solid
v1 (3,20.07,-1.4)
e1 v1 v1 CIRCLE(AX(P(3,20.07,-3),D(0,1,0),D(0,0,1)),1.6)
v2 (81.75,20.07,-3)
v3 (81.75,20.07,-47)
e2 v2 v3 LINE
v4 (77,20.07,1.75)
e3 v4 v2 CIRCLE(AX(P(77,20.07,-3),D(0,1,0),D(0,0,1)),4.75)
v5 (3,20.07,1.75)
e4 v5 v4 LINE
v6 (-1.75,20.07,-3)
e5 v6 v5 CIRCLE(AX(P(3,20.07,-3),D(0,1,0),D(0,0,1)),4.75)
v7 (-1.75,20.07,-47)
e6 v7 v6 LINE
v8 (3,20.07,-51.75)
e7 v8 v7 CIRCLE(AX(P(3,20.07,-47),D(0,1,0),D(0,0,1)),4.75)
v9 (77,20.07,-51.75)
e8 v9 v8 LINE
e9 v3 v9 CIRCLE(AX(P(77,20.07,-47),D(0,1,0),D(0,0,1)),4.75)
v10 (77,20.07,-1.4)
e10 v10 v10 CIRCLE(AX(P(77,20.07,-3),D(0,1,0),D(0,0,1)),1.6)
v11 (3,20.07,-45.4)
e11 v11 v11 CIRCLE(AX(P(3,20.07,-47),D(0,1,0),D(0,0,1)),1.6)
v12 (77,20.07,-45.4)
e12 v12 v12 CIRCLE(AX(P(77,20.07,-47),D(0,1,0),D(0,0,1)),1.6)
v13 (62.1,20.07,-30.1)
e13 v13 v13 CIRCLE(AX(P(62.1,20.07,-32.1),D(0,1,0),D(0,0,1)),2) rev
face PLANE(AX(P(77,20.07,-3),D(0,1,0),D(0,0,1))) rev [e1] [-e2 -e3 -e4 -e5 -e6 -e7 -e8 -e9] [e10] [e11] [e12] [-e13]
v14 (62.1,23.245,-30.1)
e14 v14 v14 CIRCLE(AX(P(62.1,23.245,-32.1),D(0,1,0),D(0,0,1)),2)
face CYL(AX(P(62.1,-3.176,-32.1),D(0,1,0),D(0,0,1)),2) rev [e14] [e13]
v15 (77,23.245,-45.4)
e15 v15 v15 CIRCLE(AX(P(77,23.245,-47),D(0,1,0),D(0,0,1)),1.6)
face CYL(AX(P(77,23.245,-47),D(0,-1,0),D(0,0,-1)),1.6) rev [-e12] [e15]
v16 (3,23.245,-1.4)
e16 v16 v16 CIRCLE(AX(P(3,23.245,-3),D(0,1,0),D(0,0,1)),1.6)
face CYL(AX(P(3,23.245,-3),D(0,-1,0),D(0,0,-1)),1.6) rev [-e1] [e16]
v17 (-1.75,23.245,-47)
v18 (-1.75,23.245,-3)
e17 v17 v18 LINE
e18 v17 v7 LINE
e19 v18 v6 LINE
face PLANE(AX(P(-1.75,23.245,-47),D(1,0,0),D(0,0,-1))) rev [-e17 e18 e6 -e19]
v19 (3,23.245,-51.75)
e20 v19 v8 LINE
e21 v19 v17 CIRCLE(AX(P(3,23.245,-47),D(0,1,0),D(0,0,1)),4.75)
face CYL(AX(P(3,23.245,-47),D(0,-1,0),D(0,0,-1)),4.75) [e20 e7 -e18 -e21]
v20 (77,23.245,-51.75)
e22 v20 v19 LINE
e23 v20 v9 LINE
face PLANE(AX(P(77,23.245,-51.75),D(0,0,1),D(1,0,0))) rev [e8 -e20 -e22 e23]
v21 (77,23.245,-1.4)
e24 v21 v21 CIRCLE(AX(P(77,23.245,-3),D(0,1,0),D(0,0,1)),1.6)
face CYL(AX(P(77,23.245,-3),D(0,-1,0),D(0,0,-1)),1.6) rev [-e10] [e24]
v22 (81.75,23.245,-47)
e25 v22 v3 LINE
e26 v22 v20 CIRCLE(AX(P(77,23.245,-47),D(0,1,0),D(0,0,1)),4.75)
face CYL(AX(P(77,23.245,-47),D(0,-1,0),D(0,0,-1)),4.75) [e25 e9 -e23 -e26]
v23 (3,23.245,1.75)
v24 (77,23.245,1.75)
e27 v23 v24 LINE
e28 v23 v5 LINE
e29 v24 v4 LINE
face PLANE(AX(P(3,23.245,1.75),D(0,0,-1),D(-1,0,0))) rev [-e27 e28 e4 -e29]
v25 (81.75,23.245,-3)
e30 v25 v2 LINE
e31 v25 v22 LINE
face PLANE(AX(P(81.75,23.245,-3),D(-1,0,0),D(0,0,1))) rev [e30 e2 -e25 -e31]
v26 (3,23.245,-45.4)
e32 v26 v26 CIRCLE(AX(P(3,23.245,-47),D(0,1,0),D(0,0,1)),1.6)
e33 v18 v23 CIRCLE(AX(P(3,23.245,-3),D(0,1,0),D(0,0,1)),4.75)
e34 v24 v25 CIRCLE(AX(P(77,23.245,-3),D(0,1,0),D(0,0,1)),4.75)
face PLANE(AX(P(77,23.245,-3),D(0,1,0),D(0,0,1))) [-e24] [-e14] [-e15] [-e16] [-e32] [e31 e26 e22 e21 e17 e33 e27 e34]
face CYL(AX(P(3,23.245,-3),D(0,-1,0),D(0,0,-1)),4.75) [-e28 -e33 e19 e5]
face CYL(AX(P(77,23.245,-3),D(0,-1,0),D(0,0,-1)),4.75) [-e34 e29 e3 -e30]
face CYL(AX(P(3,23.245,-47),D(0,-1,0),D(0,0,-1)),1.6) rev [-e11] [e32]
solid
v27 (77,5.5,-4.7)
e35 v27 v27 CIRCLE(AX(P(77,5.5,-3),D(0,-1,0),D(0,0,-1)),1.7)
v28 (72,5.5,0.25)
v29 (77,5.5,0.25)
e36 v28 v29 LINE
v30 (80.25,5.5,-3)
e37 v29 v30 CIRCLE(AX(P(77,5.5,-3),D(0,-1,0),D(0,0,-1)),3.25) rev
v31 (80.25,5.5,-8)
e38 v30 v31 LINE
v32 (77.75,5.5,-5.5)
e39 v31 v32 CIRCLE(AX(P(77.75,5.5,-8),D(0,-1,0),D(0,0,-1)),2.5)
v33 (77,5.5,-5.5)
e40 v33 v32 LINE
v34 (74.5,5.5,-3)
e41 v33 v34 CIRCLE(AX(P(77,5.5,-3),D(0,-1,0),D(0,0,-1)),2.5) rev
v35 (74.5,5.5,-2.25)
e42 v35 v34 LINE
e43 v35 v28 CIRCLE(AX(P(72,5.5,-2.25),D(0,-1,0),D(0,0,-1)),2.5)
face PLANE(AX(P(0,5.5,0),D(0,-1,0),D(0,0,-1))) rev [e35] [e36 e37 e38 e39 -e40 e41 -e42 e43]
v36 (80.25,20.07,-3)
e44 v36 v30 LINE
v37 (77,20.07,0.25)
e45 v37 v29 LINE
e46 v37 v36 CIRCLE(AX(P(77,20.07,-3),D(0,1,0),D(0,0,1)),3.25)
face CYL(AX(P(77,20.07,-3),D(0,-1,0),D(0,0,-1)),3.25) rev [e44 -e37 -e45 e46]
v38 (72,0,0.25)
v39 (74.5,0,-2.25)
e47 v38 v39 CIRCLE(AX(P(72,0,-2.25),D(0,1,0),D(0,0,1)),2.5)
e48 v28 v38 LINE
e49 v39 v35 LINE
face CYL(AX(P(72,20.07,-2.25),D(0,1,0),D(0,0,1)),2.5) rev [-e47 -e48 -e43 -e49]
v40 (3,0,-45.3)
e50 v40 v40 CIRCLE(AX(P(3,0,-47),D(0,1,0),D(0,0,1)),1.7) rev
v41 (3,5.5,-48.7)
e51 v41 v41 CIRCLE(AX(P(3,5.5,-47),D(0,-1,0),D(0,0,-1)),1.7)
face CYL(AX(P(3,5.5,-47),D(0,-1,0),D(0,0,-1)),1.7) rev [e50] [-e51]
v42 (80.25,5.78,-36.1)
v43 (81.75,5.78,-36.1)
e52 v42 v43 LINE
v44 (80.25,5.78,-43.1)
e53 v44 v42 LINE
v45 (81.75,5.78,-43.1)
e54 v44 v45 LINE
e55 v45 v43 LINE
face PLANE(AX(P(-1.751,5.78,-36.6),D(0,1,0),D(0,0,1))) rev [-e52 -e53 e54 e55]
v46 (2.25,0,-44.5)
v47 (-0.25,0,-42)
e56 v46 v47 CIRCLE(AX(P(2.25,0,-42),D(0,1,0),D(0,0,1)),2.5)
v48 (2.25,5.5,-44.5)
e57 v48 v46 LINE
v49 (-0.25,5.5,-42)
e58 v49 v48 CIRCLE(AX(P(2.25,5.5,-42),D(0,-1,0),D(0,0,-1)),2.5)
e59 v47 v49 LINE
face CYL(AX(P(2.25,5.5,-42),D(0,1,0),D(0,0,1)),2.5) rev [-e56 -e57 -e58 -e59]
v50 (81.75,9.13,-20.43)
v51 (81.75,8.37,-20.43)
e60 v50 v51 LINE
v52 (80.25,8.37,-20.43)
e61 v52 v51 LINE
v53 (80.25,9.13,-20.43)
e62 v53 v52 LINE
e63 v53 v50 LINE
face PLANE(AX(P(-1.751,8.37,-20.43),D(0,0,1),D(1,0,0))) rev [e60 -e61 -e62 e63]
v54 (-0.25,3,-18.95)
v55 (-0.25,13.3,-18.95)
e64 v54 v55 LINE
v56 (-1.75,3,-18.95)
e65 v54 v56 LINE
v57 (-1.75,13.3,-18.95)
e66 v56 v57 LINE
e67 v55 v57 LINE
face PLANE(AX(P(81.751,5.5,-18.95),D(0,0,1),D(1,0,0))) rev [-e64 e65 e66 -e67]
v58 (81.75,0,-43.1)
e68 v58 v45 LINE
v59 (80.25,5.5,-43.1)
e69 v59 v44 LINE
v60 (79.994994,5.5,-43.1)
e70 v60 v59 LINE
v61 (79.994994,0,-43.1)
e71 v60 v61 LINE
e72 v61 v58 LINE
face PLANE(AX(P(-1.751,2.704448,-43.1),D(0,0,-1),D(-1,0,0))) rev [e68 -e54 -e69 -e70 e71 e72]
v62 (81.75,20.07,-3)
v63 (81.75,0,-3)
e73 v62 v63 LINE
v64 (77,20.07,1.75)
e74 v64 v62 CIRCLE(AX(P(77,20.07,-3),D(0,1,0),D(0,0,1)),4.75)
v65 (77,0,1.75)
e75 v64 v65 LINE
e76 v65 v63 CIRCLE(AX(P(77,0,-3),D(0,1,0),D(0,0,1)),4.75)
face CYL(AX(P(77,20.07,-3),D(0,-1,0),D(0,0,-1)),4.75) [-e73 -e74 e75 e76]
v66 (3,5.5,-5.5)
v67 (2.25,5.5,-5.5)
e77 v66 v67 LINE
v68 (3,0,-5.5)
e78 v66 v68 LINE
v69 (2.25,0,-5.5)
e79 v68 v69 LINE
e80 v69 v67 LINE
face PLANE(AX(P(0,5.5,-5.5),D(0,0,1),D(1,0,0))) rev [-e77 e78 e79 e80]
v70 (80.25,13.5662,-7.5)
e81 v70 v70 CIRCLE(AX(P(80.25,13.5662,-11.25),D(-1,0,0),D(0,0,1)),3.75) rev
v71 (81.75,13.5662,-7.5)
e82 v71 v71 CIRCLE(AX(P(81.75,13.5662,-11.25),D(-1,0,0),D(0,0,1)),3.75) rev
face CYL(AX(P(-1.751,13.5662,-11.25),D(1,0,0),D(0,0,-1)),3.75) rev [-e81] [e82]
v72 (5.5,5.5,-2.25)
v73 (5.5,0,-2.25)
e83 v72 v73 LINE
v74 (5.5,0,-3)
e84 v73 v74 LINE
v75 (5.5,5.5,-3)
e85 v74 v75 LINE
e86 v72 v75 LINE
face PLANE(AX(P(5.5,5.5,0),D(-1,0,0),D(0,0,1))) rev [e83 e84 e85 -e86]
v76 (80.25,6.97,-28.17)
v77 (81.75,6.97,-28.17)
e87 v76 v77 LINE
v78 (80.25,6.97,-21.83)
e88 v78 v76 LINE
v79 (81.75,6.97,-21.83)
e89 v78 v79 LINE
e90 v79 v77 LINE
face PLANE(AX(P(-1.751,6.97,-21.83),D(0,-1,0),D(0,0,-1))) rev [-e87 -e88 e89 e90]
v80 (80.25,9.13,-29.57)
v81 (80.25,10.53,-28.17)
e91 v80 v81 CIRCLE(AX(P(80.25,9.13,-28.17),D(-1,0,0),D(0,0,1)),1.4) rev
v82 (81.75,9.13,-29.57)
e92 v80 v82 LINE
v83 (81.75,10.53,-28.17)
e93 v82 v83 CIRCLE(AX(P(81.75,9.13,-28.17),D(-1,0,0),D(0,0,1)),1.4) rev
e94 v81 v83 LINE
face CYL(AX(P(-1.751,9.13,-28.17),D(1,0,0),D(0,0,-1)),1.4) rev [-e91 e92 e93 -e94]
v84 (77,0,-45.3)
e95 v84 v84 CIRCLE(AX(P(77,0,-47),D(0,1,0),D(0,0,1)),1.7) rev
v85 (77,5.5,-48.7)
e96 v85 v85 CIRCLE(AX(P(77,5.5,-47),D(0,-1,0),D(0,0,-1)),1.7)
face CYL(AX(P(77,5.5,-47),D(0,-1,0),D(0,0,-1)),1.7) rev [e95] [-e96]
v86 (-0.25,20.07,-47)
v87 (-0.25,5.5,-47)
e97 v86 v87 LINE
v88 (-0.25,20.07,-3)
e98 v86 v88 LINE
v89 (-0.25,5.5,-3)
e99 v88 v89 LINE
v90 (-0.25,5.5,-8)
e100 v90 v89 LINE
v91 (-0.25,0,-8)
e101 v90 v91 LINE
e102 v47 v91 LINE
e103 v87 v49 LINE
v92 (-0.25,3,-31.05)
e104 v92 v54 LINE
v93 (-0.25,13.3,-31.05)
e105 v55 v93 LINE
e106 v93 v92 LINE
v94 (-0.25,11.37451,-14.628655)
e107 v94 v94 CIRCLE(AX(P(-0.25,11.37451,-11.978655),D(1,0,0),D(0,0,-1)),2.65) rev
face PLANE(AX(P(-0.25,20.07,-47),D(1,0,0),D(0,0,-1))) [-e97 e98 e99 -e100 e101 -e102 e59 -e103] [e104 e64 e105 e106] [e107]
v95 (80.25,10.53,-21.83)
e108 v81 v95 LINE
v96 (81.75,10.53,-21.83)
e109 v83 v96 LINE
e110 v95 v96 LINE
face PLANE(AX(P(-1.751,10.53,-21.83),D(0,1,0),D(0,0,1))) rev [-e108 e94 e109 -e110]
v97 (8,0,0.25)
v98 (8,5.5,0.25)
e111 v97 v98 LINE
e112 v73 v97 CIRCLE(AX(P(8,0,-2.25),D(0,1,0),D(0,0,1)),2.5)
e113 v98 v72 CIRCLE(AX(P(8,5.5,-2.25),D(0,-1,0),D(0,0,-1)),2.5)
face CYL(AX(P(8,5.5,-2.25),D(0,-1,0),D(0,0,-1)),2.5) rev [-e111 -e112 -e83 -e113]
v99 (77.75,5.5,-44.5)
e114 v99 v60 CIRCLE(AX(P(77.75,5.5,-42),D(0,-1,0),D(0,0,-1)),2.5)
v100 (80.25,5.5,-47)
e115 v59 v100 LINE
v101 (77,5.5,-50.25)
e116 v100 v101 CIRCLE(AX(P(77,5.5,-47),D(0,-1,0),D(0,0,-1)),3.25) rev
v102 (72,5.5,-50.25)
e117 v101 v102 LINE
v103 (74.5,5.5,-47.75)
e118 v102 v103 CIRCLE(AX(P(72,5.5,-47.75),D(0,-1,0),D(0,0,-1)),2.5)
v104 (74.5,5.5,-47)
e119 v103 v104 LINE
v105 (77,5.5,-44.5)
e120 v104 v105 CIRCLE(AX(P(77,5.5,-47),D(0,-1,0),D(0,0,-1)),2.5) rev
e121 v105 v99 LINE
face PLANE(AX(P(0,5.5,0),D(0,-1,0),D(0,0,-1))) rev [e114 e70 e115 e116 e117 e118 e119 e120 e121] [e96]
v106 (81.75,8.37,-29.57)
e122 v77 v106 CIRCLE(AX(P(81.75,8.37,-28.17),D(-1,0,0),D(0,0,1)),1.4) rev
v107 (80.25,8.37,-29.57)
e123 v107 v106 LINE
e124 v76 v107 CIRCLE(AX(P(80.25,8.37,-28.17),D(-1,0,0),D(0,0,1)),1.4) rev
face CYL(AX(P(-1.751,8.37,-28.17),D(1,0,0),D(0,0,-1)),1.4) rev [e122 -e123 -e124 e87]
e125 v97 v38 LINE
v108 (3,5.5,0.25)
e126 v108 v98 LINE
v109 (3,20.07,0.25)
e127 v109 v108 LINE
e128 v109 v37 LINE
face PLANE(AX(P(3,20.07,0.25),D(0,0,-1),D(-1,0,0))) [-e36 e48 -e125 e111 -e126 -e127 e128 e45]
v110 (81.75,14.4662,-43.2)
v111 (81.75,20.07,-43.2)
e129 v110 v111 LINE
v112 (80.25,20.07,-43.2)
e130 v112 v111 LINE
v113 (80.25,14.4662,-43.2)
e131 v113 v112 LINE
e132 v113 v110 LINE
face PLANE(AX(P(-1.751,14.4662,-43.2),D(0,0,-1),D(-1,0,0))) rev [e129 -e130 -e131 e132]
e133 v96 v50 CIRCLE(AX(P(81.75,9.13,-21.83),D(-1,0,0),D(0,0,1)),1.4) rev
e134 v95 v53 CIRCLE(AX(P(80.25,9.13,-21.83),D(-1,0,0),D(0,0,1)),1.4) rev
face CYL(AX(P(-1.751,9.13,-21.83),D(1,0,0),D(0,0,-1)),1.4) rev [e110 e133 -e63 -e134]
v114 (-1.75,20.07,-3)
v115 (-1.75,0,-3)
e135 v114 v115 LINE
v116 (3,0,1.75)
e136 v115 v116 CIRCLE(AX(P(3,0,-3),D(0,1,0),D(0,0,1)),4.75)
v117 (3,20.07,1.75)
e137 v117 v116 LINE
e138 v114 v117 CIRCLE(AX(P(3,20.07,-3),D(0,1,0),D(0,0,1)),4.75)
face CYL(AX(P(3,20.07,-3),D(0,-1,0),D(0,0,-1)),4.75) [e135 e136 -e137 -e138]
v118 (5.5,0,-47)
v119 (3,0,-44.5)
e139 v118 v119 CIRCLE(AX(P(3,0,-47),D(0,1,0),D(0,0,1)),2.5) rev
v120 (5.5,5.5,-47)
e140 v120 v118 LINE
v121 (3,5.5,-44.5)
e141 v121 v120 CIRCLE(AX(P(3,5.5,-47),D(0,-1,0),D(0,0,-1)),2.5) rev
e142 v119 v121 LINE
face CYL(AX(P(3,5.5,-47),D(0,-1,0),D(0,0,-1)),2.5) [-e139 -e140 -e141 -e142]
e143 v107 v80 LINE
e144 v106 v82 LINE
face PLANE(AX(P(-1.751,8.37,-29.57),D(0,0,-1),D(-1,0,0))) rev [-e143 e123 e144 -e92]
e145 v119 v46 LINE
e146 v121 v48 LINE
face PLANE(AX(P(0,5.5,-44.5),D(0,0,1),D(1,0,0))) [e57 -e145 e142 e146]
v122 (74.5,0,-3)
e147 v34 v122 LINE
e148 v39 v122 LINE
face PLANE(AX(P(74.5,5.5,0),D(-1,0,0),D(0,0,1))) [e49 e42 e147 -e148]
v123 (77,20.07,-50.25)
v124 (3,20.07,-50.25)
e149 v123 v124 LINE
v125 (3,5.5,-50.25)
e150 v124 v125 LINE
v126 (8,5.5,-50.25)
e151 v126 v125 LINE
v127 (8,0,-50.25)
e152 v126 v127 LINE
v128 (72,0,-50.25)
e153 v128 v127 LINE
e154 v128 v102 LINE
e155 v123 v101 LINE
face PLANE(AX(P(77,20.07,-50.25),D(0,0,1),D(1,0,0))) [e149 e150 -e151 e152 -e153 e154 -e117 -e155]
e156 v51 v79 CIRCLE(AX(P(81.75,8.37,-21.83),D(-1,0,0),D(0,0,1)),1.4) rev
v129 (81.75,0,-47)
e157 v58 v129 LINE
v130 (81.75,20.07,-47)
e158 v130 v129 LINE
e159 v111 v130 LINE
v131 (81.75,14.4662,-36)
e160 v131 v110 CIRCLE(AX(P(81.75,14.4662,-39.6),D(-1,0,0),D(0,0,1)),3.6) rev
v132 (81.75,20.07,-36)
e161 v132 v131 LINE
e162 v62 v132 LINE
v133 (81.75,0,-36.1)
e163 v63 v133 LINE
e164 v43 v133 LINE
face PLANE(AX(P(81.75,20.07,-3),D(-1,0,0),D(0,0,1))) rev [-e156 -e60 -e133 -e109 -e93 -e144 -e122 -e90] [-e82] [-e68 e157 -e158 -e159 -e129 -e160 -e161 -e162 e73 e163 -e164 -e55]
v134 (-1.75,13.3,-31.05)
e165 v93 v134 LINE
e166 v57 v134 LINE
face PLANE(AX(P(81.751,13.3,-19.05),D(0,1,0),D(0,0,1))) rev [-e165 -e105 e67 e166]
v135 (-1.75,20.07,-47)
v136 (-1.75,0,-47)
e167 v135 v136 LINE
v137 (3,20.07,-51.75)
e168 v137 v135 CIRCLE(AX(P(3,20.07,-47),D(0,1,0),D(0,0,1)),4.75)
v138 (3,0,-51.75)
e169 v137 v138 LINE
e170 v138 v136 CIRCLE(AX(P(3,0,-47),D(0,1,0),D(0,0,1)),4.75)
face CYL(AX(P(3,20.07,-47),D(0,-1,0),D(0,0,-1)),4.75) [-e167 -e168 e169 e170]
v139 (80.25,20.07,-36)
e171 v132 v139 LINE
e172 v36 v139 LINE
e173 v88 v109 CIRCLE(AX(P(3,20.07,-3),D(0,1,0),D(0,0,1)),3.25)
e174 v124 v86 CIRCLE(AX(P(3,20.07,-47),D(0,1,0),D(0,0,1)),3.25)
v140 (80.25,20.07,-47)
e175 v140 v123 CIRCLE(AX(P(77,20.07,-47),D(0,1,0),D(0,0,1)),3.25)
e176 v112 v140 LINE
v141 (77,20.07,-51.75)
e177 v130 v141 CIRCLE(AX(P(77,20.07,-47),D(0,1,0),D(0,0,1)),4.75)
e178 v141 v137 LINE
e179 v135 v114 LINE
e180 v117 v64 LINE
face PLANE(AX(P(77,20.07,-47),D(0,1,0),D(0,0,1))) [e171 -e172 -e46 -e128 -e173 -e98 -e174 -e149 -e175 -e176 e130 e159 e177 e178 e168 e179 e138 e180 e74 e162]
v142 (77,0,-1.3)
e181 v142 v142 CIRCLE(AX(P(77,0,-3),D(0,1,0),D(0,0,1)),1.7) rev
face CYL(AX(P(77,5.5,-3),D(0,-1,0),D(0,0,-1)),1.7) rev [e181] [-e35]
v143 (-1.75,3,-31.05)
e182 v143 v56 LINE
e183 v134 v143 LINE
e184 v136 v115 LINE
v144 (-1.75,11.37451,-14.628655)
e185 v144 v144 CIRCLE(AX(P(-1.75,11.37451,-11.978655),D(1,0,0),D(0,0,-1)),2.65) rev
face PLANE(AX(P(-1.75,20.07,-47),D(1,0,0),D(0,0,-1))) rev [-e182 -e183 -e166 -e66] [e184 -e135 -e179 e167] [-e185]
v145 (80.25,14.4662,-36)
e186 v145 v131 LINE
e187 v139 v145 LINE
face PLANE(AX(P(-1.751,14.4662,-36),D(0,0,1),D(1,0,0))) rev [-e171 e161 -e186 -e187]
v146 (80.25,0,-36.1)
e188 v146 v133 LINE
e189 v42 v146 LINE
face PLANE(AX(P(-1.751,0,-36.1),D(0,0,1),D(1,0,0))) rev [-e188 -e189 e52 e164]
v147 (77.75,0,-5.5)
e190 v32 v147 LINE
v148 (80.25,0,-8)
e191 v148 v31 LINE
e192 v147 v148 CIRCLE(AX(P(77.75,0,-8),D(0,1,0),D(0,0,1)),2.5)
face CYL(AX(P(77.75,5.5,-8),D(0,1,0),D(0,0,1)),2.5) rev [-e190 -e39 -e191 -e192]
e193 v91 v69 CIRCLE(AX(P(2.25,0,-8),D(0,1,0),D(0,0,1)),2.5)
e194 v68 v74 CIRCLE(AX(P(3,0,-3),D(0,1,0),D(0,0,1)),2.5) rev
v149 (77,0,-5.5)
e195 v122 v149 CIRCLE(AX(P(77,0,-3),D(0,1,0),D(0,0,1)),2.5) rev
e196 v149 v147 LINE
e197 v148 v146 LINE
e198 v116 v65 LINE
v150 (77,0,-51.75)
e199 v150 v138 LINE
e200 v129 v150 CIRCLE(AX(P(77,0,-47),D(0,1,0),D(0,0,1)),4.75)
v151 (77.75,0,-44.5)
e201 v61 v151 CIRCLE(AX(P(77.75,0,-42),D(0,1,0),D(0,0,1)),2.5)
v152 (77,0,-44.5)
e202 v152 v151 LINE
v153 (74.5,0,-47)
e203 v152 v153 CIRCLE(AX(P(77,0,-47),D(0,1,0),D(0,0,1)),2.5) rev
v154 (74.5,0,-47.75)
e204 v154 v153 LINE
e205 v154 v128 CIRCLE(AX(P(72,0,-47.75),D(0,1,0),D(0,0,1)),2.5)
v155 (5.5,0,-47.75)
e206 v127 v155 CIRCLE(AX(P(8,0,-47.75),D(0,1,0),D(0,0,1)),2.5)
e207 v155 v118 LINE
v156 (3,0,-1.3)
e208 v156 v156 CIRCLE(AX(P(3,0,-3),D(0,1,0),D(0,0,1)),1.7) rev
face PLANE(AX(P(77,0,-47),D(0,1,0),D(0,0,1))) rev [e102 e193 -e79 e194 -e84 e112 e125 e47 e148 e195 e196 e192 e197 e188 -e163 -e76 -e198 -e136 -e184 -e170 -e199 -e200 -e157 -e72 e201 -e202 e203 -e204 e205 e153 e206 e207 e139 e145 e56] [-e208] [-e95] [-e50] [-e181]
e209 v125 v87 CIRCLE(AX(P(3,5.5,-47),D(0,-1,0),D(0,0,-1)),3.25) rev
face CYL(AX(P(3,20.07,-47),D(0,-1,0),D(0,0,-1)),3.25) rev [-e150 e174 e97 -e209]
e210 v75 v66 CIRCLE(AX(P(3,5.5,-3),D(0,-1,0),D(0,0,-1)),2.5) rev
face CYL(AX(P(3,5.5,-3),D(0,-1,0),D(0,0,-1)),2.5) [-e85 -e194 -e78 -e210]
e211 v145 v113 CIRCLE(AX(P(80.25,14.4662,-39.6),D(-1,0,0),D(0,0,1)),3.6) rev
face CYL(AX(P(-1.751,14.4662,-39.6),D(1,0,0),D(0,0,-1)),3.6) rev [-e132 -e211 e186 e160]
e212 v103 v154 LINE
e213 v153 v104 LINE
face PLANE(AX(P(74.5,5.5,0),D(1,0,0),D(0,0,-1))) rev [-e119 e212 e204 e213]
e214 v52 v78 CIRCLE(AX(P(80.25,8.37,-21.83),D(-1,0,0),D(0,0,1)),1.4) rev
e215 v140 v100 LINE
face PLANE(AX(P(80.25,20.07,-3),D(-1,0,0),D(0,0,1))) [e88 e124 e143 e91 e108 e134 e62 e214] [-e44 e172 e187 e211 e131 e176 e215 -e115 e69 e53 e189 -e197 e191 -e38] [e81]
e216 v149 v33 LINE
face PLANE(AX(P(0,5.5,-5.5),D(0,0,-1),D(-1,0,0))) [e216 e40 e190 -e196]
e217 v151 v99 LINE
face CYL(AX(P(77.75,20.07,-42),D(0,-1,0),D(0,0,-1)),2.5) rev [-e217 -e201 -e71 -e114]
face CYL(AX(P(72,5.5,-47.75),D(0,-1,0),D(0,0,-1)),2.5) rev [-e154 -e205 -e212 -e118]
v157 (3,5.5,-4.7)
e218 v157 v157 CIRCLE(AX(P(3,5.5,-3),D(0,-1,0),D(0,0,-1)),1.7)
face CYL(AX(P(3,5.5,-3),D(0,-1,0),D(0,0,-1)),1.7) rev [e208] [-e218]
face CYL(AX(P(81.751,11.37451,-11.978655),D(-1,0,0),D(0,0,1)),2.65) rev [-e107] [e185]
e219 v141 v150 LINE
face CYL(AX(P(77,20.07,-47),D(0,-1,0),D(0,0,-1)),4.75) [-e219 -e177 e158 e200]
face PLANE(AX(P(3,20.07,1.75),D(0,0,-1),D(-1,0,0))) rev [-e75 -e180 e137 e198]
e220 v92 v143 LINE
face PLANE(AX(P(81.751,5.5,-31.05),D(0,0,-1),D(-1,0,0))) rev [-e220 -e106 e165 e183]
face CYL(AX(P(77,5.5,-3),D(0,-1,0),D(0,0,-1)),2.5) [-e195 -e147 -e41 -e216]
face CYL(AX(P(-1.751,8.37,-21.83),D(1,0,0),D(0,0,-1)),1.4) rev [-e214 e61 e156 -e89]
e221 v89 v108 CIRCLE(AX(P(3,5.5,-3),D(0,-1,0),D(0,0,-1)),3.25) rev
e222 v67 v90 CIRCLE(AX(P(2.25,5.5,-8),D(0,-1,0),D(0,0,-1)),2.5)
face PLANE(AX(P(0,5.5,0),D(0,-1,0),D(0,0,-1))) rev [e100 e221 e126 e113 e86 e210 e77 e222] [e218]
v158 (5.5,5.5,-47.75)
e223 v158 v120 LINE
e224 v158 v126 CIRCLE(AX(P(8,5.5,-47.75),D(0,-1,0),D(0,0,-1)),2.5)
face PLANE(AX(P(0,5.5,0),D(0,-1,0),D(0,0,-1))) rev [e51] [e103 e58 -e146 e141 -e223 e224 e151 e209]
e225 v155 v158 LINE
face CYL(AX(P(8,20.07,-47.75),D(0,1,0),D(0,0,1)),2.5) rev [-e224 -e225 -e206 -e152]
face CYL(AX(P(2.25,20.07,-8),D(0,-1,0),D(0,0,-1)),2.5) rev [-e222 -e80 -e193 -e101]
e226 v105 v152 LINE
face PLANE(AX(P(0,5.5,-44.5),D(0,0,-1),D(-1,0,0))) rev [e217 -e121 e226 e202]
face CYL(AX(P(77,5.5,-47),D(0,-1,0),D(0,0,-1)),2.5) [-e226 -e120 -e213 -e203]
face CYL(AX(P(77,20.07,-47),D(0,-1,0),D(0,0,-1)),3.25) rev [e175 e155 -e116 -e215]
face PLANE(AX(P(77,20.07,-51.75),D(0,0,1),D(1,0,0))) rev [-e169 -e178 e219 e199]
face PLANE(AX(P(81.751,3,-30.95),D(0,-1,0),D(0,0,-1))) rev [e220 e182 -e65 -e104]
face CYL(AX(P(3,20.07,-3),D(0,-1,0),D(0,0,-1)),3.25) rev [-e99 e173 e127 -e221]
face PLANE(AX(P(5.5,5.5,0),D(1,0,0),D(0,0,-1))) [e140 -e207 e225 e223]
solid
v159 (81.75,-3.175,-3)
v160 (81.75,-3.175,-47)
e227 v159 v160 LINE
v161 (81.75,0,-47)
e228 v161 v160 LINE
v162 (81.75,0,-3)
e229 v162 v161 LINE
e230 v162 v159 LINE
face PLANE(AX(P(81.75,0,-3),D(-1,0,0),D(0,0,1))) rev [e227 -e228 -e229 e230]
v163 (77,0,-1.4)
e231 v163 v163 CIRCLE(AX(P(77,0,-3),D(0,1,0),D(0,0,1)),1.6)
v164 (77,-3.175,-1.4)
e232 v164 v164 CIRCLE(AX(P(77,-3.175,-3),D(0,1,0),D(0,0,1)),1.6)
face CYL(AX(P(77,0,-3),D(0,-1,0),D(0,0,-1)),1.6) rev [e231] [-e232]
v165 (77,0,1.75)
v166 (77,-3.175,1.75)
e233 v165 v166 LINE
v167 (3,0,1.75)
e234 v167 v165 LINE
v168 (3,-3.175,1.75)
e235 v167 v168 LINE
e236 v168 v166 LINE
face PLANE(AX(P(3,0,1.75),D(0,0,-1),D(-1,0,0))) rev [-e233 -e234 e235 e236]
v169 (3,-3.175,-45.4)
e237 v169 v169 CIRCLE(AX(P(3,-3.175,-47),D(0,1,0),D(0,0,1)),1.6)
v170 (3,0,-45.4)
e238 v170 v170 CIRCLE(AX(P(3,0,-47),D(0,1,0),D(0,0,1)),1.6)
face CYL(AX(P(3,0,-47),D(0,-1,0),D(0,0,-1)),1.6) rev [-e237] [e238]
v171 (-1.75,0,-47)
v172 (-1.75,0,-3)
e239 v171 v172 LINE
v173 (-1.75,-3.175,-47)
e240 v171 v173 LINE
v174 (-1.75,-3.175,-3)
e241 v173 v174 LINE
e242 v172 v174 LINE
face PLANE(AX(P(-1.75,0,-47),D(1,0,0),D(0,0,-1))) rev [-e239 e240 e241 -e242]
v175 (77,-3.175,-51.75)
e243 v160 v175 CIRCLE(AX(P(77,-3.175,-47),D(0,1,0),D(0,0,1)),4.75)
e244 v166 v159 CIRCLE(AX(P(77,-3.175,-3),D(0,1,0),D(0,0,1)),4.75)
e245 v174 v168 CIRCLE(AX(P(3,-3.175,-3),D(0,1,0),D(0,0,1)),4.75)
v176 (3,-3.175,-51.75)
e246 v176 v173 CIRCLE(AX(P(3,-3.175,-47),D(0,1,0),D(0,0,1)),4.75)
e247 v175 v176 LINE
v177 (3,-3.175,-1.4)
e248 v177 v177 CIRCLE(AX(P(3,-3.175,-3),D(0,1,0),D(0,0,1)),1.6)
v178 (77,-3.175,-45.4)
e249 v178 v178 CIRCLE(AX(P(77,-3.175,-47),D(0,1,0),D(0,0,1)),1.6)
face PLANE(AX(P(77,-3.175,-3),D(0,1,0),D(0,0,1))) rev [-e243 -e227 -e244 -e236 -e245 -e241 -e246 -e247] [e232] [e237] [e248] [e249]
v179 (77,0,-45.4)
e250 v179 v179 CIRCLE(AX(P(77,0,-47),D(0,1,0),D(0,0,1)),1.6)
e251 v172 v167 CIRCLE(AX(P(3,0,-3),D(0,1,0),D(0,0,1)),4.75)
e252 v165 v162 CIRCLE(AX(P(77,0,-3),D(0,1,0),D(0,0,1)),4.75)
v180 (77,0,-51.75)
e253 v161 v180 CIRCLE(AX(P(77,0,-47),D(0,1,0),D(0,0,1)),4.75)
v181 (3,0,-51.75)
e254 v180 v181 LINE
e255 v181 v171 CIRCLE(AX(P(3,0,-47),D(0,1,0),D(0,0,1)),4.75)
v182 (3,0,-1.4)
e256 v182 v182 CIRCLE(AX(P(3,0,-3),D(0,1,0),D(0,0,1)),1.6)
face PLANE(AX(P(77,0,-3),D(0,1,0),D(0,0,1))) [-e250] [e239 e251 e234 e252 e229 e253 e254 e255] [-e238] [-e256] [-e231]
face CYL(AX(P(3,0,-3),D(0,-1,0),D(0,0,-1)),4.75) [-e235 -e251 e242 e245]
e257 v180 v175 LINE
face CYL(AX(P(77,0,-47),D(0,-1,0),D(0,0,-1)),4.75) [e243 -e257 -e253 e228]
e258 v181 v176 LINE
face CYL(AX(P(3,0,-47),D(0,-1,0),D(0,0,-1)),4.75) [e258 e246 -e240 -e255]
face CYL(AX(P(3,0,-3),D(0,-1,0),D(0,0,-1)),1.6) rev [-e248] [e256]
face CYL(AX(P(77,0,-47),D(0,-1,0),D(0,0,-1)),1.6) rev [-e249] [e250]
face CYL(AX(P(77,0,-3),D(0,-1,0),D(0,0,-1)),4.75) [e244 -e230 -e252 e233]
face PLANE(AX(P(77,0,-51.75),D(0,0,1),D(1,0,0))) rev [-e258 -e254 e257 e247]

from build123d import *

# Parameters (mm, degrees)
BOSS_EXTRUDE1_DEPTH      = 20.07
SKETCH3_R                = 1.6
BOSS_EXTRUDE2_DEPTH      = 5.5
FILLET1_R                = 2.5
DATA_SIDE_REACH          = 102.265
SKETCH4_R                = 3.25
IO_SIDE_REACH            = 102.265
SKETCH5_R                = 2.15
SKETCH5_W                = 11.9
SKETCH5_H                = 7.3
PLUG_CLEARANCE_REACH     = 102.265
SKETCH10_W               = 11.9
SKETCH10_H               = 2.5
SKETCH10_H_2             = 0.5
MOVE_START               = 79.994994432
MOVE_FACE1_OUTLINE_R     = 3.75
MOVE_FACE1_OUTLINE_R_2   = 3.25
MOVE_FACE1_DEPTH         = 3.005005568
MOVE_START_2             = -3
MOVE_FACE1_2_OUTLINE_R   = 2.65
MOVE_FACE1_2_OUTLINE_R_2 = 2.15
MOVE_FACE1_2_DEPTH       = 82.994994432
MOVE_FACE2_BY            = 0.1
MOVE_FACE2_2_BY          = 0.1
MOVE_FACE2_3_BY          = 0.1
MOVE_FACE2_4_BY          = 0.1
MOVE_FACE2_5_BY          = 0.1
MOVE_FACE2_6_BY          = 0.1
MOVE_FACE2_7_BY          = 0.1
MOVE_FACE2_8_BY          = 0.1
MOVE_FACE2_9_BY          = 0.1
MOVE_FACE2_10_BY         = 0.1
MOVE_FACE3_BY            = 0.1
MOVE_FACE3_2_BY          = 0.1
MOVE_FACE3_3_BY          = 0.1
MOVE_FACE3_4_BY          = 0.1
SKETCH6_R                = 1.6
BOSS_EXTRUDE3_DEPTH      = 3.175
SKETCH7_R                = 2
CUT_EXTRUDE3_DEPTH       = 3.175


with BuildPart() as part:
    # Sketch2 → Boss-Extrude1 (new body)
    with BuildSketch(Plane(origin=(0, 0, 0), x_dir=(1, 0, 0), z_dir=(0, 1, 0))):
        with BuildLine():
            Line((77, 51.75), (3, 51.75))
            ThreePointArc((3, 51.75), (-0.358757211, 50.358757211), (-1.75, 47))
            Line((-1.75, 47), (-1.75, 3))
            ThreePointArc((-1.75, 3), (-0.358757211, -0.358757211), (3, -1.75))
            Line((3, -1.75), (77, -1.75))
            ThreePointArc((77, -1.75), (80.358757211, -0.358757211), (81.75, 3))
            Line((81.75, 3), (81.75, 47))
            ThreePointArc((81.75, 47), (80.358757211, 50.358757211), (77, 51.75))
        make_face()
        with BuildLine():
            Line((-0.25, 47), (-0.25, 3))
            ThreePointArc((-0.25, 3), (0.701902961, 0.701902961), (3, -0.25))
            Line((3, -0.25), (77, -0.25))
            ThreePointArc((77, -0.25), (79.298097039, 0.701902961), (80.25, 3))
            Line((80.25, 3), (80.25, 47))
            ThreePointArc((80.25, 47), (79.298097039, 49.298097039), (77, 50.25))
            Line((77, 50.25), (3, 50.25))
            ThreePointArc((3, 50.25), (0.701902961, 49.298097039), (-0.25, 47))
        make_face(mode=Mode.SUBTRACT)
    extrude(amount=BOSS_EXTRUDE1_DEPTH)

    # Sketch3 → Boss-Extrude2 (add)
    # profile 1 of 4: a face of its own
    with BuildSketch(Plane.XZ):
        with BuildLine():
            ThreePointArc((-0.25, -47), (0.701902961, -49.298097039), (3, -50.25))
            Line((3, -50.25), (5.5, -50.25))
            Line((5.5, -50.25), (5.5, -44.5))
            Line((5.5, -44.5), (-0.25, -44.5))
            Line((-0.25, -44.5), (-0.25, -47))
        make_face()
        with Locations(Location((3, -47, 0), (0, 0, 270))):
            Circle(SKETCH3_R, mode=Mode.SUBTRACT)
    # profile 2 of 4: a face of its own
    with BuildSketch(Plane.XZ):
        with BuildLine():
            Line((74.5, -44.5), (74.5, -50.25))
            Line((74.5, -50.25), (77, -50.25))
            ThreePointArc((77, -50.25), (79.298097039, -49.298097039), (80.25, -47))
            Line((80.25, -47), (80.25, -44.5))
            Line((80.25, -44.5), (74.5, -44.5))
        make_face()
        with Locations(Location((77, -47, 0), (0, 0, 270))):
            Circle(SKETCH3_R, mode=Mode.SUBTRACT)
    # profile 3 of 4: a face of its own
    with BuildSketch(Plane.XZ):
        with BuildLine():
            Line((74.5, -5.5), (80.25, -5.5))
            Line((80.25, -5.5), (80.25, -3))
            ThreePointArc((80.25, -3), (79.298097039, -0.701902961), (77, 0.25))
            Line((77, 0.25), (74.5, 0.25))
            Line((74.5, 0.25), (74.5, -5.5))
        make_face()
        with Locations(Location((77, -3, 0), (0, 0, 270))):
            Circle(SKETCH3_R, mode=Mode.SUBTRACT)
    # profile 4 of 4: a face of its own
    with BuildSketch(Plane.XZ):
        with BuildLine():
            Line((-0.25, -3), (-0.25, -5.5))
            Line((-0.25, -5.5), (5.5, -5.5))
            Line((5.5, -5.5), (5.5, 0.25))
            Line((5.5, 0.25), (3, 0.25))
            ThreePointArc((3, 0.25), (0.701902961, -0.701902961), (-0.25, -3))
        make_face()
        with Locations(Location((3, -3, 0), (0, 0, 270))):
            Circle(SKETCH3_R, mode=Mode.SUBTRACT)
    extrude(amount=-BOSS_EXTRUDE2_DEPTH)

    # Fillet1
    fillet1_edges = [part.edges().sort_by_distance(p)[0] for p in [
        (5.5, 2.75, 0.25),
        (5.5, 2.75, -5.5),
        (-0.25, 2.75, -5.5),
        (5.5, 2.75, -44.5),
        (5.5, 2.75, -50.25),
        (-0.25, 2.75, -44.5),
        (74.5, 2.75, -50.25),
        (74.5, 2.75, -44.5),
        (80.25, 2.75, -44.5),
        (74.5, 2.75, -5.5),
        (74.5, 2.75, 0.25),
        (80.25, 2.75, -5.5),
    ]]
    fillet(fillet1_edges, radius=FILLET1_R)

    # Sketch4 → data side (cut, up to next)
    with BuildSketch(Plane(origin=(81.75, 0, 0), x_dir=(0, 0, -1), z_dir=(1, 0, 0)), mode=Mode.PRIVATE) as data_side_sk1:
        with Locations((11.25, 13.5662)):
            Circle(SKETCH4_R)
    data_side_tool1 = extrude(data_side_sk1.sketch, amount=-DATA_SIDE_REACH, mode=Mode.PRIVATE) & part.part
    # Sketch4 → data side (cut, up to next)
    with BuildSketch(Plane(origin=(81.75, 0, 0), x_dir=(0, 0, -1), z_dir=(1, 0, 0)), mode=Mode.PRIVATE) as data_side_sk2:
        with BuildLine():
            Line((21.83, 7.07), (28.17, 7.07))
            ThreePointArc((28.17, 7.07), (29.089238816, 7.450761184), (29.47, 8.37))
            Line((29.47, 8.37), (29.47, 9.13))
            ThreePointArc((29.47, 9.13), (29.089238816, 10.049238816), (28.17, 10.43))
            Line((28.17, 10.43), (21.83, 10.43))
            ThreePointArc((21.83, 10.43), (20.910761184, 10.049238816), (20.53, 9.13))
            Line((20.53, 9.13), (20.53, 8.37))
            ThreePointArc((20.53, 8.37), (20.910761184, 7.450761184), (21.83, 7.07))
        make_face()
    data_side_tool2 = extrude(data_side_sk2.sketch, amount=-DATA_SIDE_REACH, mode=Mode.PRIVATE) & part.part
    # Sketch4 → data side (cut, up to next)
    with BuildSketch(Plane(origin=(81.75, 0, 0), x_dir=(0, 0, -1), z_dir=(1, 0, 0)), mode=Mode.PRIVATE) as data_side_sk3:
        with BuildLine():
            Line((36.5, 14.4662), (36.5, 20.07))
            ThreePointArc((36.5, 20.07), (39.6, 23.17), (42.7, 20.07))
            Line((42.7, 20.07), (42.7, 14.4662))
            ThreePointArc((42.7, 14.4662), (39.6, 11.3662), (36.5, 14.4662))
        make_face()
    data_side_tool3 = extrude(data_side_sk3.sketch, amount=-DATA_SIDE_REACH, mode=Mode.PRIVATE) & part.part
    # Sketch4 → data side (cut, up to next)
    with BuildSketch(Plane(origin=(81.75, 0, 0), x_dir=(0, 0, -1), z_dir=(1, 0, 0)), mode=Mode.PRIVATE) as data_side_sk4:
        Polygon((36.6, 2.78), (36.6, 5.28), (42.6, 5.28), (42.6, 2.704447838), (42.6, 0), (36.6, 0), align=None)
    data_side_tool4 = extrude(data_side_sk4.sketch, amount=-DATA_SIDE_REACH, mode=Mode.PRIVATE) & part.part
    add(data_side_tool1.solids().sort_by_distance((81.75, 13.5662, -11.25))[0], mode=Mode.SUBTRACT)
    add(data_side_tool2.solids().sort_by_distance((81.75, 8.75, -25))[0], mode=Mode.SUBTRACT)
    add(data_side_tool3.solids().sort_by_distance((81.75, 17.2681, -39.6))[0], mode=Mode.SUBTRACT)
    add(data_side_tool4.solids().sort_by_distance((81.75, 2.64, -39.6))[0], mode=Mode.SUBTRACT)

    # Sketch5 → io side (cut, up to next)
    with BuildSketch(Plane.ZY.offset(1.75), mode=Mode.PRIVATE) as io_side_sk1:
        with Locations((-11.97865482, 11.37450981)):
            Circle(SKETCH5_R)
    io_side_tool1 = extrude(io_side_sk1.sketch, amount=-IO_SIDE_REACH, mode=Mode.PRIVATE) & part.part
    # Sketch5 → io side (cut, up to next)
    with BuildSketch(Plane.ZY.offset(1.75), mode=Mode.PRIVATE) as io_side_sk2:
        with Locations((-25, 9.15)):
            Rectangle(SKETCH5_W, SKETCH5_H)
    io_side_tool2 = extrude(io_side_sk2.sketch, amount=-IO_SIDE_REACH, mode=Mode.PRIVATE) & part.part
    add(io_side_tool1.solids().sort_by_distance((-1.75, 11.37451, -11.978655))[0], mode=Mode.SUBTRACT)
    add(io_side_tool2.solids().sort_by_distance((-1.75, 9.15, -25))[0], mode=Mode.SUBTRACT)

    # Sketch10 → plug clearance (cut, up to next)
    with BuildSketch(Plane.ZY.offset(1.75), mode=Mode.PRIVATE) as plug_clearance_sk1:
        with Locations((-25, 4.25)):
            Rectangle(SKETCH10_W, SKETCH10_H)
    plug_clearance_tool1 = extrude(plug_clearance_sk1.sketch, amount=-PLUG_CLEARANCE_REACH, mode=Mode.PRIVATE) & part.part
    # Sketch10 → plug clearance (cut, up to next)
    with BuildSketch(Plane.ZY.offset(1.75), mode=Mode.PRIVATE) as plug_clearance_sk2:
        with Locations((-25, 13.05)):
            Rectangle(SKETCH10_W, SKETCH10_H_2)
    plug_clearance_tool2 = extrude(plug_clearance_sk2.sketch, amount=-PLUG_CLEARANCE_REACH, mode=Mode.PRIVATE) & part.part
    add(plug_clearance_tool1.solids().sort_by_distance((-1.75, 4.25, -25))[0], mode=Mode.SUBTRACT)
    add(plug_clearance_tool2.solids().sort_by_distance((-1.75, 13.05, -25))[0], mode=Mode.SUBTRACT)

    # Move Face1: read off the stored shape, not the designer's step
    # Move Face1 outline → Move Face1 (cut)
    # profile 1 of 3: a face of its own
    with BuildSketch(Plane.YZ.offset(MOVE_START)):
        Polygon((0, -42.6), (0, -43.1), (5.5, -43.1), (5.78, -43.1), (5.78, -36.1), (0, -36.1), (0, -36.6), (5.28, -36.6), (5.28, -42.6), align=None)
    # profile 2 of 3: a face of its own
    with BuildSketch(Plane.YZ.offset(MOVE_START)):
        with Locations((13.5662, -11.25)):
            Circle(MOVE_FACE1_OUTLINE_R)
        with Locations((13.5662, -11.25)):
            Circle(MOVE_FACE1_OUTLINE_R_2, mode=Mode.SUBTRACT)
    # profile 3 of 3: a face of its own
    with BuildSketch(Plane.YZ.offset(MOVE_START)):
        with BuildLine():
            ThreePointArc((14.4662, -36), (10.8662, -39.6), (14.4662, -43.2))
            Line((14.4662, -43.2), (20.07, -43.2))
            Line((20.07, -43.2), (20.07, -42.7))
            Line((20.07, -42.7), (14.4662, -42.7))
            ThreePointArc((14.4662, -42.7), (11.3662, -39.6), (14.4662, -36.5))
            Line((14.4662, -36.5), (20.07, -36.5))
            Line((20.07, -36.5), (20.07, -36))
            Line((20.07, -36), (14.4662, -36))
        make_face()
    extrude(amount=MOVE_FACE1_DEPTH, mode=Mode.SUBTRACT)

    # Move Face1 2 outline → Move Face1 2 (cut)
    with BuildSketch(Plane.YZ.offset(MOVE_START_2)):
        with Locations((11.37450981, -11.97865482)):
            Circle(MOVE_FACE1_2_OUTLINE_R)
        with Locations((11.37450981, -11.97865482)):
            Circle(MOVE_FACE1_2_OUTLINE_R_2, mode=Mode.SUBTRACT)
    extrude(amount=MOVE_FACE1_2_DEPTH, mode=Mode.SUBTRACT)

    # Move Face2: a face moved inward by 0.1
    extrude(part.faces().sort_by_distance((-1, 8.15, -19.05))[0], amount=MOVE_FACE2_BY, dir=(0, 0, 1), mode=Mode.SUBTRACT)

    # Move Face2 2: a face moved inward by 0.1
    extrude(part.faces().sort_by_distance((-1, 8.15, -30.95))[0], amount=MOVE_FACE2_2_BY, dir=(0, 0, -1), mode=Mode.SUBTRACT)

    # Move Face2 3: a curved face moved inward by 0.1
    add(Solid.thicken(part.faces().sort_by_distance((81, 7.450761184, -29.089238816))[0], -MOVE_FACE2_3_BY), mode=Mode.SUBTRACT)

    # Move Face2 4: a face moved inward by 0.1
    extrude(part.faces().sort_by_distance((81, 10.43, -25))[0], amount=MOVE_FACE2_4_BY, dir=(0, 1, 0), mode=Mode.SUBTRACT)

    # Move Face2 5: a face moved inward by 0.1
    extrude(part.faces().sort_by_distance((81, 8.75, -29.47))[0], amount=MOVE_FACE2_5_BY, dir=(0, 0, -1), mode=Mode.SUBTRACT)

    # Move Face2 6: a curved face moved inward by 0.1
    add(Solid.thicken(part.faces().sort_by_distance((81, 10.049238816, -29.089238816))[0], -MOVE_FACE2_6_BY), mode=Mode.SUBTRACT)

    # Move Face2 7: a curved face moved inward by 0.1
    add(Solid.thicken(part.faces().sort_by_distance((81, 10.049238816, -20.910761184))[0], -MOVE_FACE2_7_BY), mode=Mode.SUBTRACT)

    # Move Face2 8: a face moved inward by 0.1
    extrude(part.faces().sort_by_distance((81, 8.75, -20.53))[0], amount=MOVE_FACE2_8_BY, dir=(0, 0, 1), mode=Mode.SUBTRACT)

    # Move Face2 9: a face moved inward by 0.1
    extrude(part.faces().sort_by_distance((81, 7.07, -25))[0], amount=MOVE_FACE2_9_BY, dir=(0, -1, 0), mode=Mode.SUBTRACT)

    # Move Face2 10: a curved face moved inward by 0.1
    add(Solid.thicken(part.faces().sort_by_distance((81, 7.450761184, -20.910761184))[0], -MOVE_FACE2_10_BY), mode=Mode.SUBTRACT)

    # Move Face3: a curved face moved inward by 0.1
    add(Solid.thicken(part.faces().sort_by_distance((3, 2.75, -45.4))[0], -MOVE_FACE3_BY), mode=Mode.SUBTRACT)

    # Move Face3 2: a curved face moved inward by 0.1
    add(Solid.thicken(part.faces().sort_by_distance((77, 2.75, -45.4))[0], -MOVE_FACE3_2_BY), mode=Mode.SUBTRACT)

    # Move Face3 3: a curved face moved inward by 0.1
    add(Solid.thicken(part.faces().sort_by_distance((77, 2.75, -1.4))[0], -MOVE_FACE3_3_BY), mode=Mode.SUBTRACT)

    # Move Face3 4: a curved face moved inward by 0.1
    add(Solid.thicken(part.faces().sort_by_distance((3, 2.75, -1.4))[0], -MOVE_FACE3_4_BY), mode=Mode.SUBTRACT)


with BuildPart() as body_2:
    # Sketch6 → Boss-Extrude3 (new body)
    with BuildSketch(Plane(origin=(0, 20.07, 0), x_dir=(1, 0, 0), z_dir=(0, 1, 0))):
        with BuildLine():
            Line((3, -1.75), (77, -1.75))
            ThreePointArc((77, -1.75), (80.358757211, -0.358757211), (81.75, 3))
            Line((81.75, 3), (81.75, 47))
            ThreePointArc((81.75, 47), (80.358757211, 50.358757211), (77, 51.75))
            Line((77, 51.75), (3, 51.75))
            ThreePointArc((3, 51.75), (-0.358757211, 50.358757211), (-1.75, 47))
            Line((-1.75, 47), (-1.75, 3))
            ThreePointArc((-1.75, 3), (-0.358757211, -0.358757211), (3, -1.75))
        make_face()
        with Locations(Location((77, 47, 0), (0, 0, 270))):
            Circle(SKETCH6_R, mode=Mode.SUBTRACT)
        with Locations(Location((3, 47, 0), (0, 0, 270))):
            Circle(SKETCH6_R, mode=Mode.SUBTRACT)
        with Locations(Location((77, 3, 0), (0, 0, 270))):
            Circle(SKETCH6_R, mode=Mode.SUBTRACT)
        with Locations(Location((3, 3, 0), (0, 0, 270))):
            Circle(SKETCH6_R, mode=Mode.SUBTRACT)
    extrude(amount=BOSS_EXTRUDE3_DEPTH)


with BuildPart() as body_3:
    # Body-Move/Copy3: copy of body 2
    add(body_2.part.moved(Location((0, -44.867382743, 0))))


with BuildPart() as body_3_1:
    # Body-Move/Copy4: read off the stored shape, not the designer's step
    # Body-Move/Copy4: moved
    add(body_3.part.moved(Location((0, 21.6223827, 0))))


with BuildPart() as body_2_1:
    add(body_2.part)

    # Sketch7 → Cut-Extrude3 (cut)
    with BuildSketch(Plane(origin=(0, 23.245, 0), x_dir=(1, 0, 0), z_dir=(0, 1, 0))):
        with Locations(Location((62.1, 32.1, 0), (0, 0, 270))):
            Circle(SKETCH7_R)
    extrude(amount=-CUT_EXTRUDE3_DEPTH, mode=Mode.SUBTRACT)


solid = Compound([part.part, body_3_1.part, body_2_1.part])
